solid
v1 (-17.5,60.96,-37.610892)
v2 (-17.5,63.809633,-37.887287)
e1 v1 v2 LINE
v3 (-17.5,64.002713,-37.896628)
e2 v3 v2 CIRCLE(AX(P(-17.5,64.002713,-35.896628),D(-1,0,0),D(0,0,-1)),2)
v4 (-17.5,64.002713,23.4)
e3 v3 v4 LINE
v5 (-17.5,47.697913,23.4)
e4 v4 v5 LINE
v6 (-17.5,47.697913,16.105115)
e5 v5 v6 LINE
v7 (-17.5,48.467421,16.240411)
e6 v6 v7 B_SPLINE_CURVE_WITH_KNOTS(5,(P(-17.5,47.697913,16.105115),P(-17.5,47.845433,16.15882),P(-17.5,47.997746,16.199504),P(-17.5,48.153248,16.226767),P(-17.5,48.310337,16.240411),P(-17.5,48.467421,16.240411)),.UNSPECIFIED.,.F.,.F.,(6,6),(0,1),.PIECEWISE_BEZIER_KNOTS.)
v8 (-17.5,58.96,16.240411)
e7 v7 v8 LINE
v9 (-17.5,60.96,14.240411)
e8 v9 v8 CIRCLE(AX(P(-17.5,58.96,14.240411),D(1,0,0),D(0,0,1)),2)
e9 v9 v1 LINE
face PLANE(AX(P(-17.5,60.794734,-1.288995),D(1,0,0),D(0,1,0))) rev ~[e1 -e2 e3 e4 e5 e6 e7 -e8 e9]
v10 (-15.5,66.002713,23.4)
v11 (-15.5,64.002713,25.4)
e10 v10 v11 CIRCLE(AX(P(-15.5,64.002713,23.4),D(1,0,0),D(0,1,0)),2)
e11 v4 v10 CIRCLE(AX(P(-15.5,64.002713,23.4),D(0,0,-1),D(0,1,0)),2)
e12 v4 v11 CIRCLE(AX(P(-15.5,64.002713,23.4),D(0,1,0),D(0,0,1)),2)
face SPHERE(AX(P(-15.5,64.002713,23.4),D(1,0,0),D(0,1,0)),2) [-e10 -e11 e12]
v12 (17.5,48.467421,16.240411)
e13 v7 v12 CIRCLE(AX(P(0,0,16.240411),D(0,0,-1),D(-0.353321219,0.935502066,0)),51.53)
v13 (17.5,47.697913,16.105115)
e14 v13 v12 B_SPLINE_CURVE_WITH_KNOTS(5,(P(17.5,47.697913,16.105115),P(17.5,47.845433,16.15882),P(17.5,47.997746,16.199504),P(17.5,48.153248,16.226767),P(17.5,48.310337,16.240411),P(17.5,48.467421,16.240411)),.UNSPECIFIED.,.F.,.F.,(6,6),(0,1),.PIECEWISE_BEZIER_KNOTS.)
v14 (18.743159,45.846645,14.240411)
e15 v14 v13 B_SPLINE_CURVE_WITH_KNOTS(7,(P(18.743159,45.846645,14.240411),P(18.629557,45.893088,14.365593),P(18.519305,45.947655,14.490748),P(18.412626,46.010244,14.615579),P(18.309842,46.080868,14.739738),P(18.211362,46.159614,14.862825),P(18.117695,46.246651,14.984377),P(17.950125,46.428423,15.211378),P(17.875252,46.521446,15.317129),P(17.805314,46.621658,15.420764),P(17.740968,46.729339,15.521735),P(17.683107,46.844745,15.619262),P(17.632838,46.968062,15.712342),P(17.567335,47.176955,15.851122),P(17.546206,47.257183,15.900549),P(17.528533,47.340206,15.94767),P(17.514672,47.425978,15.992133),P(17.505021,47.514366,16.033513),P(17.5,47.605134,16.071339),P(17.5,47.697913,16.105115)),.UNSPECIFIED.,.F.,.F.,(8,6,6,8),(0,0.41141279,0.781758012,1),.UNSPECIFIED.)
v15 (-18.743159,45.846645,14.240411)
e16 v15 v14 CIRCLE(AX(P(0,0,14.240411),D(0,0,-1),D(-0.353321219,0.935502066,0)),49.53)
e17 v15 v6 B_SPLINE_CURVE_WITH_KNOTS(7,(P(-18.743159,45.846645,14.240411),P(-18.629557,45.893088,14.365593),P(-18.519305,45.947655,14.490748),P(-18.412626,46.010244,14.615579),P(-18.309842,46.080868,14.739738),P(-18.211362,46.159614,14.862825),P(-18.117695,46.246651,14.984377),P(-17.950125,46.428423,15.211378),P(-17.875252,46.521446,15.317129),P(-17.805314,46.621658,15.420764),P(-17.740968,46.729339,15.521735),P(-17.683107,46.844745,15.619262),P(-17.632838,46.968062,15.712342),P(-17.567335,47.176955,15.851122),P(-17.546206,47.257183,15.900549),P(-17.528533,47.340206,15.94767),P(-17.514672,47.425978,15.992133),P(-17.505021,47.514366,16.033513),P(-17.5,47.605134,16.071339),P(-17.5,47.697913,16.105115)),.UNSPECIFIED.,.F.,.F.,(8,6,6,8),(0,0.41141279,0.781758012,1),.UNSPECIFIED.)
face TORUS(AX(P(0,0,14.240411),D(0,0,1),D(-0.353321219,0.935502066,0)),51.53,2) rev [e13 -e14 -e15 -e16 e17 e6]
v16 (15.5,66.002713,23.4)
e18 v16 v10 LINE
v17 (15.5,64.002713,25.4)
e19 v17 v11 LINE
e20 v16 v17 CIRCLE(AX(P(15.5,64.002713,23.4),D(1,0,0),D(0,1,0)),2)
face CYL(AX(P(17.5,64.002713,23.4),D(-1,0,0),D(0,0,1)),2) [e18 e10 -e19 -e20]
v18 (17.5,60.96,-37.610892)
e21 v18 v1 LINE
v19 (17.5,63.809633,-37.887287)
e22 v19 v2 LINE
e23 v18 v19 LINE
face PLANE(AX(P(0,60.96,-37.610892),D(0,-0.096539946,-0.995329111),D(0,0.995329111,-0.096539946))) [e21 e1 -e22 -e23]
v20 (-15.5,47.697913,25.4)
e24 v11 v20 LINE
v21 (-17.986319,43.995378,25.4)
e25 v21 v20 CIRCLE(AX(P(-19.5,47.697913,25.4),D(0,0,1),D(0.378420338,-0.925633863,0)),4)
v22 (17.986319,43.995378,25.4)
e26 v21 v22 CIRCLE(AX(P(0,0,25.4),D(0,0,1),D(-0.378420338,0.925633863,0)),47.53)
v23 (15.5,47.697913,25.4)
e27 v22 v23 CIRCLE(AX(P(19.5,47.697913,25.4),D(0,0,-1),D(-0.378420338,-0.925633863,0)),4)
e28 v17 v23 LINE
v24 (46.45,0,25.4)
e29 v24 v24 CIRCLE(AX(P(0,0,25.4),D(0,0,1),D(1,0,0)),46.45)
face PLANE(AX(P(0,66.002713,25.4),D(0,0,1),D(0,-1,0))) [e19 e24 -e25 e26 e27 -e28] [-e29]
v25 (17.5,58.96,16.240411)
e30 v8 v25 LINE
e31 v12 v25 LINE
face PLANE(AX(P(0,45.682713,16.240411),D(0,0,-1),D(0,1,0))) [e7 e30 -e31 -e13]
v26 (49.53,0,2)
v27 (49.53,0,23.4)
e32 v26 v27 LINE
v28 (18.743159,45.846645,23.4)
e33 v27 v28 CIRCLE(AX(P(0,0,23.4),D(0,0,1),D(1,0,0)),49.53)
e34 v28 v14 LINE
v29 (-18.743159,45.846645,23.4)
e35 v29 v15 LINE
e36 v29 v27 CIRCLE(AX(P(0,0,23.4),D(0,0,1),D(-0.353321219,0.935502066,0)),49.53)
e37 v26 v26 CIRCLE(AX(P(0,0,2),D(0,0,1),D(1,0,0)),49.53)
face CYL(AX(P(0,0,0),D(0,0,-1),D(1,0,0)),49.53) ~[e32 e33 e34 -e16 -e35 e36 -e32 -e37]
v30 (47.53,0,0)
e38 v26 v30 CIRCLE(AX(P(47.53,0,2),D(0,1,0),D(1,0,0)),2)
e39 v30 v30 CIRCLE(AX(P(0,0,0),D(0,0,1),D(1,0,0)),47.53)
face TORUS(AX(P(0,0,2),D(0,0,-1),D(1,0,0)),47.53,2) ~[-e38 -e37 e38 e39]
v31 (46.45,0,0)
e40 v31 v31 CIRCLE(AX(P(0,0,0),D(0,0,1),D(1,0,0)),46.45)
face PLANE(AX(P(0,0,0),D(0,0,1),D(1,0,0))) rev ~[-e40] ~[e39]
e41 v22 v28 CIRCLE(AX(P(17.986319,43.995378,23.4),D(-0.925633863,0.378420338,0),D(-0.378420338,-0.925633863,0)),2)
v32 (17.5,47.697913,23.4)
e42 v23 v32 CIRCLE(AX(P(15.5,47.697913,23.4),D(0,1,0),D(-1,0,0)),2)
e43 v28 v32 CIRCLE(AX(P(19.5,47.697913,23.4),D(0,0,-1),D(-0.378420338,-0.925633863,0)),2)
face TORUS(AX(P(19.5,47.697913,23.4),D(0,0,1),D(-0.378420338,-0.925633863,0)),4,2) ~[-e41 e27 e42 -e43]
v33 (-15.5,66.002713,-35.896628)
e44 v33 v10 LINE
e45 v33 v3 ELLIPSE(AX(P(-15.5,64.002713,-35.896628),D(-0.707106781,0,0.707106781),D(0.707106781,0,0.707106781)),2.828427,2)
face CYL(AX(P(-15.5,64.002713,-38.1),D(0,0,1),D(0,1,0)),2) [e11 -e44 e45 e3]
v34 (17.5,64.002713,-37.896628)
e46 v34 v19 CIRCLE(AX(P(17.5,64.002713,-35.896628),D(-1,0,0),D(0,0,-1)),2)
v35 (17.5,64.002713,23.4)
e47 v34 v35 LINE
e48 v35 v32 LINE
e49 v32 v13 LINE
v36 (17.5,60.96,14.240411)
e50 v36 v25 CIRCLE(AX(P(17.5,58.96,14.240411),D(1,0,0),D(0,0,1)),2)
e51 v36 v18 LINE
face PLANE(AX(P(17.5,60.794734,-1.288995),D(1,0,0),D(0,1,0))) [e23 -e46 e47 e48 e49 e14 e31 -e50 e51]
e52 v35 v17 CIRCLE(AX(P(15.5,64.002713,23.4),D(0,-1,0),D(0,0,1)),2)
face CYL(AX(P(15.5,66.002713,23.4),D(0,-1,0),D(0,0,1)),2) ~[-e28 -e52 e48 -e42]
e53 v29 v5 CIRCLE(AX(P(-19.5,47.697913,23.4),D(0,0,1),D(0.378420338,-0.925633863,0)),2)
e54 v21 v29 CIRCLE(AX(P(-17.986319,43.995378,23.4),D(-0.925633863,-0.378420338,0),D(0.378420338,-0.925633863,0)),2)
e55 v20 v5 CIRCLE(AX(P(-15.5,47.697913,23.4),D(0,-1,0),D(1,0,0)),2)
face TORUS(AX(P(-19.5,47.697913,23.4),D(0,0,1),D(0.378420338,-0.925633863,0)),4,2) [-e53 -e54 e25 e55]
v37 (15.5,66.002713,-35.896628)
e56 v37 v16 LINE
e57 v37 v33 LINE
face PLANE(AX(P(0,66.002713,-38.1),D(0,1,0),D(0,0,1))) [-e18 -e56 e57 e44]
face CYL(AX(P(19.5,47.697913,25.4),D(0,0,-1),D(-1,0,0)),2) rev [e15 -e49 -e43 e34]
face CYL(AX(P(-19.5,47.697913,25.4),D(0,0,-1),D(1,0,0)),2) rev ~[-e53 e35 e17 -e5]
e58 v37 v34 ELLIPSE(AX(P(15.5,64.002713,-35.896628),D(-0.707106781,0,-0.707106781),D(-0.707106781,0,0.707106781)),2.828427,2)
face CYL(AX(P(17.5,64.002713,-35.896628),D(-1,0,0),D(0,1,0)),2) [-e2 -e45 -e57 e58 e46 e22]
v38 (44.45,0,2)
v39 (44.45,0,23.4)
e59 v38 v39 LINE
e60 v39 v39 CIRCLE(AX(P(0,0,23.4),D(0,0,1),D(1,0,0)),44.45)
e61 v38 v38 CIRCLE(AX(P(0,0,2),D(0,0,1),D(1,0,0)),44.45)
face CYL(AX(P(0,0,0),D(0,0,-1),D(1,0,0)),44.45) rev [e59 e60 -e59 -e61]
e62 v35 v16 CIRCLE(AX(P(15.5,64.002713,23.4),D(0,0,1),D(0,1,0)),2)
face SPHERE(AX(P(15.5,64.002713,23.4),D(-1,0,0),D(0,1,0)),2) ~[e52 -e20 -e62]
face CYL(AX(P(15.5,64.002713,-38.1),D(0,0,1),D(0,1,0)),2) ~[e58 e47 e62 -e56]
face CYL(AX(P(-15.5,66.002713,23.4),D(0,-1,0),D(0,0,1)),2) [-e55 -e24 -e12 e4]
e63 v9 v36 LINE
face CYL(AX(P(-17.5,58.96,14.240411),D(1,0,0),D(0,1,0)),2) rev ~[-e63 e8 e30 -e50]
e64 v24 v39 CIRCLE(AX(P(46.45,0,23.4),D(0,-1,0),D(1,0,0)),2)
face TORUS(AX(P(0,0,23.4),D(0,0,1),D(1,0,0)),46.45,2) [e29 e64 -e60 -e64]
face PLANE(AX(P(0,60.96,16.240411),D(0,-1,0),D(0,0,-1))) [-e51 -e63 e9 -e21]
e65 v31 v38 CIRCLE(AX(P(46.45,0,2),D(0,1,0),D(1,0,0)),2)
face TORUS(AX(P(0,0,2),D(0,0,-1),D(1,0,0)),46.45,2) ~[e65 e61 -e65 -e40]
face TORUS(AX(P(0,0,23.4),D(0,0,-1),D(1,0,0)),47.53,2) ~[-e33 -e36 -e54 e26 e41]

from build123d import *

# Parameters (mm, degrees)
F0_R     = 49.53
F0_R_2   = 44.45
F1_DEPTH = 25.4
F3_DEPTH = 17.5
F4_R     = 2


with BuildPart() as f1:
    # F0 (on Top) → F1 (new body)
    with BuildSketch(Plane.XY):
        Circle(F0_R)
        Circle(F0_R_2, mode=Mode.SUBTRACT)
    extrude(amount=F1_DEPTH)

    # F2 (on Right) → F3 (join, symmetric)
    with BuildSketch(Plane.YZ):
        Polygon((66.002712847, 25.4), (45.682712847, 25.4), (45.682712847, 16.2404105067), (60.96, 16.2404105067), (60.96, -37.6108922064), (66.002712847, -38.1), align=None)
    extrude(amount=F3_DEPTH, both=True)

    # F4
    f4_edges = [f1.edges().sort_by_distance(p)[0] for p in [
        (0, 60.96, 16.240411),
        (0, 49.53, 16.240411),
        (17.5, 46.335417, 20.820205),
        (-17.5, 46.335417, 20.820205),
        (0, 66.002713, 25.4),
        (-44.45, 0, 25.4),
        (-49.53, 0, 0),
        (49.53, 0, 12.7),
        (-28.164214, -40.743072, 25.4),
        (40.743072, 28.164214, 25.4),
        (44.45, 0, 12.7),
        (-44.45, 0, 0),
        (-17.5, 66.002713, -6.35),
        (17.5, 66.002713, -6.35),
        (0, 66.002713, -38.1),
        (17.5, 56.169065, 25.4),
        (-17.5, 56.169065, 25.4),
    ]]
    fillet(f4_edges, radius=F4_R)


solid = f1.part
